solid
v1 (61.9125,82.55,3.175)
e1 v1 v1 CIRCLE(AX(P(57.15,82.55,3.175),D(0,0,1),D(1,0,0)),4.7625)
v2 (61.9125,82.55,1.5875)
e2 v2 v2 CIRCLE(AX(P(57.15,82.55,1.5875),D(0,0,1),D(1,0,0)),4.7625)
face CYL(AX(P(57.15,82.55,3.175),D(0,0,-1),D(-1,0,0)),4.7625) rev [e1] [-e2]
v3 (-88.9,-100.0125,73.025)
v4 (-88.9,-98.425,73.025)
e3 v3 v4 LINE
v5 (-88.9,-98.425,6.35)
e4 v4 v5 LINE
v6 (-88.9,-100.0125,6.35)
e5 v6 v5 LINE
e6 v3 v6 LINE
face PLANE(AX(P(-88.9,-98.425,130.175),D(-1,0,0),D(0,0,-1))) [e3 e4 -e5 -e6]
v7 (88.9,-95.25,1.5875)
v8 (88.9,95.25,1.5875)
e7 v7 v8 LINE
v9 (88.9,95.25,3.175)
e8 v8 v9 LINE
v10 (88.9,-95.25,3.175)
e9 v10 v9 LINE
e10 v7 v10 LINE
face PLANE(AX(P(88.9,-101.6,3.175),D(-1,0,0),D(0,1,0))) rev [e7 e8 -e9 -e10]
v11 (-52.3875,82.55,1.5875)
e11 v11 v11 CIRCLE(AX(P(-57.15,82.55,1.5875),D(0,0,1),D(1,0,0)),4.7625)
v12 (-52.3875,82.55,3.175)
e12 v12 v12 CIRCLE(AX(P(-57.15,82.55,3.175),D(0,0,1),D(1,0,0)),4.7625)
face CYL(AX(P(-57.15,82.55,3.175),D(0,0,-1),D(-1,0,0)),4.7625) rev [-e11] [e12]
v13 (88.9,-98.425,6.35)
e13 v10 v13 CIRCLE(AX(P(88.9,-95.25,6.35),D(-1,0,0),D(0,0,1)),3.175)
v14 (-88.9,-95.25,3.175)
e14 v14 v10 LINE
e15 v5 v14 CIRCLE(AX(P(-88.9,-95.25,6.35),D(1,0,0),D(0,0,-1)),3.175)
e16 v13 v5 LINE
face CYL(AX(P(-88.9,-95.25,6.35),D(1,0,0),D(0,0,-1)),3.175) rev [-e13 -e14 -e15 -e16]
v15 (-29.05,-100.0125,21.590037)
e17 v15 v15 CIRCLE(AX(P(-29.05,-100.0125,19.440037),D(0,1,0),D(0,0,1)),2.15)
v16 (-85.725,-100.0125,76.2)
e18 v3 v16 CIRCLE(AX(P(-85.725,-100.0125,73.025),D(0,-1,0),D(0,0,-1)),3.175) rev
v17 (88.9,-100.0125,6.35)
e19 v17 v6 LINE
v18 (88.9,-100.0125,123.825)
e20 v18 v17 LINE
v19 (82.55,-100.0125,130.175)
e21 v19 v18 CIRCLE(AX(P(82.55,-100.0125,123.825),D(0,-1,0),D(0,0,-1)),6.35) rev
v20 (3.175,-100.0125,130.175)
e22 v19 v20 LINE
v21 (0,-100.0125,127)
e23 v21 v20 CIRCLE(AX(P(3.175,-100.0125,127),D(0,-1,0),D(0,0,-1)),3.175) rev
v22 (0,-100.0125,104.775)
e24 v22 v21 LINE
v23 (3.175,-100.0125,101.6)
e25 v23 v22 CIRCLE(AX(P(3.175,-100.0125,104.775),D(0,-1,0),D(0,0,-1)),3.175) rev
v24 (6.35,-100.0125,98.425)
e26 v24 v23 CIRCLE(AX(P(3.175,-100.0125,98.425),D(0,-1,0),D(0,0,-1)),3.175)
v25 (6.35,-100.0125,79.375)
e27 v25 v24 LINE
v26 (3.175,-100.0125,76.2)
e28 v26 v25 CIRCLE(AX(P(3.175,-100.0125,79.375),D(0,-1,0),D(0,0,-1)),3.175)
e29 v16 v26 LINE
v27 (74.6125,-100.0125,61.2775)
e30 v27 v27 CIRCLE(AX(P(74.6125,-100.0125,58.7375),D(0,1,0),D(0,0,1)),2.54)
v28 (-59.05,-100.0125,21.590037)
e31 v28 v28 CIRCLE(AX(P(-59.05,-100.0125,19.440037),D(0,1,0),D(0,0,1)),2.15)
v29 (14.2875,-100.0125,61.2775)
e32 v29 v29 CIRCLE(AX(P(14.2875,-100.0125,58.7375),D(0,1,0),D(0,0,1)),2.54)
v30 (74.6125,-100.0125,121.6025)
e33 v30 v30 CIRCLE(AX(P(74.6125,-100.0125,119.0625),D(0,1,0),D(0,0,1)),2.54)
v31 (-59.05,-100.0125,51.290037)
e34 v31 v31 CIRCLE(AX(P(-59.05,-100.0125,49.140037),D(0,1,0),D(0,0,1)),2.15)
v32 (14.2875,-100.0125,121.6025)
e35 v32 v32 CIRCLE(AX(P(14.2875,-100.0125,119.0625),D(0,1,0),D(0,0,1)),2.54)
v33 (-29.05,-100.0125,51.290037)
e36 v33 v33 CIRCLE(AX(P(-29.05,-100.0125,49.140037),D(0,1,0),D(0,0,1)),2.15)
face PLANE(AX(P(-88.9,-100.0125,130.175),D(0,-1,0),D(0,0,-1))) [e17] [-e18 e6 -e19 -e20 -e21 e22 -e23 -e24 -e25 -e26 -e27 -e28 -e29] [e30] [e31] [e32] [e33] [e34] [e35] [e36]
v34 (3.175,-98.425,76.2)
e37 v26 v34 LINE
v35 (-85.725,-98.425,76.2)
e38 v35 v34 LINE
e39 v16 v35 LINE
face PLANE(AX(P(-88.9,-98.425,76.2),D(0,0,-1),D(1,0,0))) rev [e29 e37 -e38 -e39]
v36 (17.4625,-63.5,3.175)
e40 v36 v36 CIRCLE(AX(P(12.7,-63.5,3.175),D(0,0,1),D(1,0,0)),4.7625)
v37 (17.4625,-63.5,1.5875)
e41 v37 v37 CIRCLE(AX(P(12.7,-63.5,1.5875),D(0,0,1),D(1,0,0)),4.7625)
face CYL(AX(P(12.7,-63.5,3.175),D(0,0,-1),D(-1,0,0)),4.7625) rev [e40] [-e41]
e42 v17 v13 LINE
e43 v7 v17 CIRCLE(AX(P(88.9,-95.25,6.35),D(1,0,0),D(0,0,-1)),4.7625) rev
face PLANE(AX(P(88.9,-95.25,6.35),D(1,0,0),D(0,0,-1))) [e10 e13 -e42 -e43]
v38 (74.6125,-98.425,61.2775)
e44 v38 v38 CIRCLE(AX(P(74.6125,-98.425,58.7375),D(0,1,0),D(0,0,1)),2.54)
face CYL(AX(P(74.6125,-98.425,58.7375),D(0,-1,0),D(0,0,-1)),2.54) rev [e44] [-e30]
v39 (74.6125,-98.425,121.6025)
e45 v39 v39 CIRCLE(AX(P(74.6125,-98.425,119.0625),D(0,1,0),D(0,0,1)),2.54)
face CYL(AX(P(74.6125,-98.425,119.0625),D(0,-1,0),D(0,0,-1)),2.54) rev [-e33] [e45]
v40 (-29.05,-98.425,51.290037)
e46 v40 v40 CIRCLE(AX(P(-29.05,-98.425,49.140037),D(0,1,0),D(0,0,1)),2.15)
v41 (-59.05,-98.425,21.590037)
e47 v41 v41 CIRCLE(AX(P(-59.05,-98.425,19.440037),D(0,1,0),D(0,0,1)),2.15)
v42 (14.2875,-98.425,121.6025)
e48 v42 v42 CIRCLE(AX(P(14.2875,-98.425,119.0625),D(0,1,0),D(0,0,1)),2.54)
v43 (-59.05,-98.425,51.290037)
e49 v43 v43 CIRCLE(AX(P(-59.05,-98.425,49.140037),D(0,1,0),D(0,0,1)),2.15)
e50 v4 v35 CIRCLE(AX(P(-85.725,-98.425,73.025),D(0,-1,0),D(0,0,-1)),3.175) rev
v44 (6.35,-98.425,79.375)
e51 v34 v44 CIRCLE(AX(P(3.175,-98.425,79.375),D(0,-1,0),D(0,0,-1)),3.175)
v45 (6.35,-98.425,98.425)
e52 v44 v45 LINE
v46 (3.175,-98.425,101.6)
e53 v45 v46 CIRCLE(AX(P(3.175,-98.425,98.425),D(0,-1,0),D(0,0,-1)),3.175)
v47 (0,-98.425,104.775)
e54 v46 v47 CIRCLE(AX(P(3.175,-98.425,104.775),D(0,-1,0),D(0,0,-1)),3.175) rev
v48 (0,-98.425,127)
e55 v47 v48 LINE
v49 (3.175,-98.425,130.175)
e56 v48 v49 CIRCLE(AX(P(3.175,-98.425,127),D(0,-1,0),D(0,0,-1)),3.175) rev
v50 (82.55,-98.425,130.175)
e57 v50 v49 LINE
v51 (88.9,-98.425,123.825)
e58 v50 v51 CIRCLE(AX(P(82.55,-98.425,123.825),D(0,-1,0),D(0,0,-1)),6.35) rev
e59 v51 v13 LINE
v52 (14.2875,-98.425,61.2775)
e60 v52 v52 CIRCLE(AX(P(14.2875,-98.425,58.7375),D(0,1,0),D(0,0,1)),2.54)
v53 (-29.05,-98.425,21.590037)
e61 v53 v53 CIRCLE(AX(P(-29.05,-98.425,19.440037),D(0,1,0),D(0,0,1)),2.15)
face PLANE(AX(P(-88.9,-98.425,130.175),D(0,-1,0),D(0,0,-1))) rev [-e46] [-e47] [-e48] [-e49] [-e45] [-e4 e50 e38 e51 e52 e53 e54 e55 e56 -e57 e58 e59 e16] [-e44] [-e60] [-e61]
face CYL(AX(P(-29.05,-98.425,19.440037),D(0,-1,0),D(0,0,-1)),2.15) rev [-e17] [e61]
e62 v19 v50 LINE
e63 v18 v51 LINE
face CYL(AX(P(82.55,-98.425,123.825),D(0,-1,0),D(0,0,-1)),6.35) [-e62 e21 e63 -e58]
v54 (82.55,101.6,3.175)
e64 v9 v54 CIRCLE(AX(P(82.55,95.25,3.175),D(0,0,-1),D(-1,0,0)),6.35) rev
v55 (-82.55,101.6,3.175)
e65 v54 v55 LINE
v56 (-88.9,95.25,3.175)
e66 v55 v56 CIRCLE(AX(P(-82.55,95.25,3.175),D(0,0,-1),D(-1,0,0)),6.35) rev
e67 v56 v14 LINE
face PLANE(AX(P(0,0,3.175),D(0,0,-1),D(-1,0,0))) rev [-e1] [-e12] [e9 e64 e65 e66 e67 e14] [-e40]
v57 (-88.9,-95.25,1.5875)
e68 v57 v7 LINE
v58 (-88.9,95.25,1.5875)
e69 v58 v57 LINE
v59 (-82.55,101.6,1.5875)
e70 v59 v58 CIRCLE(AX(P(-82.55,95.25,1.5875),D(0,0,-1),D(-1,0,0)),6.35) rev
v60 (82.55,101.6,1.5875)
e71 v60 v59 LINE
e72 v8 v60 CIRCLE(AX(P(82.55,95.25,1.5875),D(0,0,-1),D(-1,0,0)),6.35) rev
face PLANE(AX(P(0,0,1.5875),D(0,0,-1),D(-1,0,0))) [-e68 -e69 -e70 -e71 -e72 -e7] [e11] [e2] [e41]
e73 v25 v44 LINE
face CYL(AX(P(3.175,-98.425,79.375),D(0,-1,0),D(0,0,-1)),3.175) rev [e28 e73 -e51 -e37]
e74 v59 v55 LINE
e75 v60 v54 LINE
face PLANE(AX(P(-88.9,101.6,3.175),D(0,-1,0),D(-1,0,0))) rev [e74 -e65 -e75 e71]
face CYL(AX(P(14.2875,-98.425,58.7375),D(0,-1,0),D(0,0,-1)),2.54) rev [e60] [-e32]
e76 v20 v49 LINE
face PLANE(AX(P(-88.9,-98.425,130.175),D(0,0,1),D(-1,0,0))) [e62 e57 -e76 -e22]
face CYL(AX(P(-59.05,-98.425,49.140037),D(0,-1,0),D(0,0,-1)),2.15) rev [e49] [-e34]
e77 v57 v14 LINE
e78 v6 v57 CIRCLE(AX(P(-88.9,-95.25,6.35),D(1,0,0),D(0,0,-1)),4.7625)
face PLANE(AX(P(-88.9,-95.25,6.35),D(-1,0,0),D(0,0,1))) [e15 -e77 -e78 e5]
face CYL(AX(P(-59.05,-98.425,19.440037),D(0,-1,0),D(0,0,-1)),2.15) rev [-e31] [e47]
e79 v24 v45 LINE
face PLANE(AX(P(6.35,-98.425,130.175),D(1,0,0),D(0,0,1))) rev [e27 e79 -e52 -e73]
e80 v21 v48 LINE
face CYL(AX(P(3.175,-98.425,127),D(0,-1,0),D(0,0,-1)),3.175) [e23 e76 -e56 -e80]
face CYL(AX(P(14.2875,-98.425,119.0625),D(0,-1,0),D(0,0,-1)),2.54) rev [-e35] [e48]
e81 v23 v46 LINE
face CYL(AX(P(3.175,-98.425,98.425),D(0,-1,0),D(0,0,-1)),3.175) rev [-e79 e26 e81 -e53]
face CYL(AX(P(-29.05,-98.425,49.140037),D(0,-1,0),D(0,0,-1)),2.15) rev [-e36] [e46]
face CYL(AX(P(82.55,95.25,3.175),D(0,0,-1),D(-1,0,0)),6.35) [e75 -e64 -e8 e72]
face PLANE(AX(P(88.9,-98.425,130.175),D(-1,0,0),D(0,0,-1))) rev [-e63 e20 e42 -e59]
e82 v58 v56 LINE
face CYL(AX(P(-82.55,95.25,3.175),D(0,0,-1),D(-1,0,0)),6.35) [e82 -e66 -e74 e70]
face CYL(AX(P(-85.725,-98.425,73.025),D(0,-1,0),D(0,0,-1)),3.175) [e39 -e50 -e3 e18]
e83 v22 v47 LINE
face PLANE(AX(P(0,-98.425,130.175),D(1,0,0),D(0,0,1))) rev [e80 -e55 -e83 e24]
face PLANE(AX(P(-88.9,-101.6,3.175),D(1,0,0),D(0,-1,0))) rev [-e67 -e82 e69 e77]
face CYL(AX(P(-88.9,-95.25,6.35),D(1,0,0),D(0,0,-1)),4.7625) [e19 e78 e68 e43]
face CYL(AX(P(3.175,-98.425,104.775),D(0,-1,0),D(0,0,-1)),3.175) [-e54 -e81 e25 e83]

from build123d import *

# Parameters (mm, degrees)
SKETCH2_W               = 177.8
SKETCH2_H               = 203.2
BOSS_EXTRUDE1_DEPTH     = 3.175
SKETCH3_W               = 177.8
SKETCH3_H               = 3.175
BOSS_EXTRUDE2_DEPTH     = 127
FILLET1_R               = 3.175
FILLET2_R               = 6.35
CUT_EXTRUDE1_DEPTH      = 255.673793803
CUT_EXTRUDE1_DEPTH_BACK = 255.673793803
FILLET4_R               = 3.175
SKETCH6_R               = 2.54
SKETCH6_R_2             = 2.15
CUT_EXTRUDE2_DEPTH      = 255.673793803
SKETCH7_R               = 4.7625
CUT_EXTRUDE3_DEPTH      = 186.350397895
CONVERT_SOLID1_START    = -88.9
CONVERT_SOLID1_DEPTH    = 177.8


# Read off the part's stored shape, not the designer's step: Convert-Solid1
with BuildPart() as part:
    # Sketch2 → Boss-Extrude1 (new body)
    with BuildSketch(Plane.XY):
        Rectangle(SKETCH2_W, SKETCH2_H)
    extrude(amount=BOSS_EXTRUDE1_DEPTH)

    # Sketch3 → Boss-Extrude2 (add)
    with BuildSketch(Plane.XY.offset(3.175)):
        with Locations((0, -100.0125)):
            Rectangle(SKETCH3_W, SKETCH3_H)
    extrude(amount=BOSS_EXTRUDE2_DEPTH)

    # Fillet1
    fillet1_edges = [part.edges().sort_by_distance(p)[0] for p in [
        (0, -98.425, 3.175),
        (0, -101.6, 0),
    ]]
    fillet(fillet1_edges, radius=FILLET1_R)

    # Fillet2
    fillet2_edges = [part.edges().sort_by_distance(p)[0] for p in [
        (-88.9, -100.0125, 130.175),
        (88.9, -100.0125, 130.175),
        (-88.9, 101.6, 1.5875),
        (88.9, 101.6, 1.5875),
    ]]
    fillet(fillet2_edges, radius=FILLET2_R)

    # Sketch5 → Cut-Extrude1 (cut, two sides: drawn at the far end of the back side and taken through both)
    with BuildSketch(Plane(origin=(0, -98.425, 0), x_dir=(1, 0, 0), z_dir=(0, 1, 0)).offset(-CUT_EXTRUDE1_DEPTH_BACK)):
        Polygon((-485.781273778, -76.2), (-88.9, -76.2), (6.35, -76.2), (6.35, -101.6), (0, -101.6), (0, -130.175), (0, -527.056273778), (-539.971017798, -1108.855450333), (-1025.752291576, -657.999176556), align=None)
    extrude(amount=CUT_EXTRUDE1_DEPTH + CUT_EXTRUDE1_DEPTH_BACK, mode=Mode.SUBTRACT)

    # Fillet4
    fillet4_edges = [part.edges().sort_by_distance(p)[0] for p in [
        (6.35, -100.0125, 101.6),
        (-88.9, -100.0125, 76.2),
        (0, -100.0125, 130.175),
        (0, -100.0125, 101.6),
        (6.35, -100.0125, 76.2),
    ]]
    fillet(fillet4_edges, radius=FILLET4_R - 0.0001)  # a hair under: the kernel refuses the full size

    # Sketch6 → Cut-Extrude2 (cut, through all)
    with BuildSketch(Plane(origin=(0, -98.425, 0), x_dir=(1, 0, 0), z_dir=(0, 1, 0))):
        with Locations(Location((74.6125, -119.0625, 0), (0, 0, 270))):
            Circle(SKETCH6_R)
        with Locations(Location((14.2875, -119.0625, 0), (0, 0, 270))):
            Circle(SKETCH6_R)
        with Locations(Location((14.2875, -58.7375, 0), (0, 0, 270))):
            Circle(SKETCH6_R)
        with Locations(Location((74.6125, -58.7375, 0), (0, 0, 270))):
            Circle(SKETCH6_R)
        with Locations(Location((-29.05, -49.140037229, 0), (0, 0, 270))):
            Circle(SKETCH6_R_2)
        with Locations(Location((-59.05, -49.140037229, 0), (0, 0, 270))):
            Circle(SKETCH6_R_2)
        with Locations(Location((-29.05, -19.440037229, 0), (0, 0, 270))):
            Circle(SKETCH6_R_2)
        with Locations(Location((-59.05, -19.440037229, 0), (0, 0, 270))):
            Circle(SKETCH6_R_2)
    extrude(amount=-CUT_EXTRUDE2_DEPTH, mode=Mode.SUBTRACT)

    # Sketch7 → Cut-Extrude3 (cut, through all)
    with BuildSketch(Plane.XY.offset(3.175)):
        with Locations((-57.15, 82.55)):
            Circle(SKETCH7_R)
        with Locations((57.15, 82.55)):
            Circle(SKETCH7_R)
        with Locations((12.7, -63.5)):
            Circle(SKETCH7_R)
    extrude(amount=-CUT_EXTRUDE3_DEPTH, mode=Mode.SUBTRACT)

    # Convert-Solid1 outline → Convert-Solid1 (cut)
    with BuildSketch(Plane.YZ.offset(CONVERT_SOLID1_START)):
        with BuildLine():
            ThreePointArc((-95.25, 1.5875), (-98.617596045, 2.982403955), (-100.0125, 6.35))
            Line((-100.0125, 6.35), (-100.0125, 130.175))
            Line((-100.0125, 130.175), (-101.6, 130.175))
            Line((-101.6, 130.175), (-101.6, 3.175))
            ThreePointArc((-101.6, 3.175), (-100.67006403, 0.92993597), (-98.425, 0))
            Line((-98.425, 0), (101.6, 0))
            Line((101.6, 0), (101.6, 1.5875))
            Line((101.6, 1.5875), (-95.25, 1.5875))
        make_face()
    extrude(amount=CONVERT_SOLID1_DEPTH, mode=Mode.SUBTRACT)


solid = part.part
